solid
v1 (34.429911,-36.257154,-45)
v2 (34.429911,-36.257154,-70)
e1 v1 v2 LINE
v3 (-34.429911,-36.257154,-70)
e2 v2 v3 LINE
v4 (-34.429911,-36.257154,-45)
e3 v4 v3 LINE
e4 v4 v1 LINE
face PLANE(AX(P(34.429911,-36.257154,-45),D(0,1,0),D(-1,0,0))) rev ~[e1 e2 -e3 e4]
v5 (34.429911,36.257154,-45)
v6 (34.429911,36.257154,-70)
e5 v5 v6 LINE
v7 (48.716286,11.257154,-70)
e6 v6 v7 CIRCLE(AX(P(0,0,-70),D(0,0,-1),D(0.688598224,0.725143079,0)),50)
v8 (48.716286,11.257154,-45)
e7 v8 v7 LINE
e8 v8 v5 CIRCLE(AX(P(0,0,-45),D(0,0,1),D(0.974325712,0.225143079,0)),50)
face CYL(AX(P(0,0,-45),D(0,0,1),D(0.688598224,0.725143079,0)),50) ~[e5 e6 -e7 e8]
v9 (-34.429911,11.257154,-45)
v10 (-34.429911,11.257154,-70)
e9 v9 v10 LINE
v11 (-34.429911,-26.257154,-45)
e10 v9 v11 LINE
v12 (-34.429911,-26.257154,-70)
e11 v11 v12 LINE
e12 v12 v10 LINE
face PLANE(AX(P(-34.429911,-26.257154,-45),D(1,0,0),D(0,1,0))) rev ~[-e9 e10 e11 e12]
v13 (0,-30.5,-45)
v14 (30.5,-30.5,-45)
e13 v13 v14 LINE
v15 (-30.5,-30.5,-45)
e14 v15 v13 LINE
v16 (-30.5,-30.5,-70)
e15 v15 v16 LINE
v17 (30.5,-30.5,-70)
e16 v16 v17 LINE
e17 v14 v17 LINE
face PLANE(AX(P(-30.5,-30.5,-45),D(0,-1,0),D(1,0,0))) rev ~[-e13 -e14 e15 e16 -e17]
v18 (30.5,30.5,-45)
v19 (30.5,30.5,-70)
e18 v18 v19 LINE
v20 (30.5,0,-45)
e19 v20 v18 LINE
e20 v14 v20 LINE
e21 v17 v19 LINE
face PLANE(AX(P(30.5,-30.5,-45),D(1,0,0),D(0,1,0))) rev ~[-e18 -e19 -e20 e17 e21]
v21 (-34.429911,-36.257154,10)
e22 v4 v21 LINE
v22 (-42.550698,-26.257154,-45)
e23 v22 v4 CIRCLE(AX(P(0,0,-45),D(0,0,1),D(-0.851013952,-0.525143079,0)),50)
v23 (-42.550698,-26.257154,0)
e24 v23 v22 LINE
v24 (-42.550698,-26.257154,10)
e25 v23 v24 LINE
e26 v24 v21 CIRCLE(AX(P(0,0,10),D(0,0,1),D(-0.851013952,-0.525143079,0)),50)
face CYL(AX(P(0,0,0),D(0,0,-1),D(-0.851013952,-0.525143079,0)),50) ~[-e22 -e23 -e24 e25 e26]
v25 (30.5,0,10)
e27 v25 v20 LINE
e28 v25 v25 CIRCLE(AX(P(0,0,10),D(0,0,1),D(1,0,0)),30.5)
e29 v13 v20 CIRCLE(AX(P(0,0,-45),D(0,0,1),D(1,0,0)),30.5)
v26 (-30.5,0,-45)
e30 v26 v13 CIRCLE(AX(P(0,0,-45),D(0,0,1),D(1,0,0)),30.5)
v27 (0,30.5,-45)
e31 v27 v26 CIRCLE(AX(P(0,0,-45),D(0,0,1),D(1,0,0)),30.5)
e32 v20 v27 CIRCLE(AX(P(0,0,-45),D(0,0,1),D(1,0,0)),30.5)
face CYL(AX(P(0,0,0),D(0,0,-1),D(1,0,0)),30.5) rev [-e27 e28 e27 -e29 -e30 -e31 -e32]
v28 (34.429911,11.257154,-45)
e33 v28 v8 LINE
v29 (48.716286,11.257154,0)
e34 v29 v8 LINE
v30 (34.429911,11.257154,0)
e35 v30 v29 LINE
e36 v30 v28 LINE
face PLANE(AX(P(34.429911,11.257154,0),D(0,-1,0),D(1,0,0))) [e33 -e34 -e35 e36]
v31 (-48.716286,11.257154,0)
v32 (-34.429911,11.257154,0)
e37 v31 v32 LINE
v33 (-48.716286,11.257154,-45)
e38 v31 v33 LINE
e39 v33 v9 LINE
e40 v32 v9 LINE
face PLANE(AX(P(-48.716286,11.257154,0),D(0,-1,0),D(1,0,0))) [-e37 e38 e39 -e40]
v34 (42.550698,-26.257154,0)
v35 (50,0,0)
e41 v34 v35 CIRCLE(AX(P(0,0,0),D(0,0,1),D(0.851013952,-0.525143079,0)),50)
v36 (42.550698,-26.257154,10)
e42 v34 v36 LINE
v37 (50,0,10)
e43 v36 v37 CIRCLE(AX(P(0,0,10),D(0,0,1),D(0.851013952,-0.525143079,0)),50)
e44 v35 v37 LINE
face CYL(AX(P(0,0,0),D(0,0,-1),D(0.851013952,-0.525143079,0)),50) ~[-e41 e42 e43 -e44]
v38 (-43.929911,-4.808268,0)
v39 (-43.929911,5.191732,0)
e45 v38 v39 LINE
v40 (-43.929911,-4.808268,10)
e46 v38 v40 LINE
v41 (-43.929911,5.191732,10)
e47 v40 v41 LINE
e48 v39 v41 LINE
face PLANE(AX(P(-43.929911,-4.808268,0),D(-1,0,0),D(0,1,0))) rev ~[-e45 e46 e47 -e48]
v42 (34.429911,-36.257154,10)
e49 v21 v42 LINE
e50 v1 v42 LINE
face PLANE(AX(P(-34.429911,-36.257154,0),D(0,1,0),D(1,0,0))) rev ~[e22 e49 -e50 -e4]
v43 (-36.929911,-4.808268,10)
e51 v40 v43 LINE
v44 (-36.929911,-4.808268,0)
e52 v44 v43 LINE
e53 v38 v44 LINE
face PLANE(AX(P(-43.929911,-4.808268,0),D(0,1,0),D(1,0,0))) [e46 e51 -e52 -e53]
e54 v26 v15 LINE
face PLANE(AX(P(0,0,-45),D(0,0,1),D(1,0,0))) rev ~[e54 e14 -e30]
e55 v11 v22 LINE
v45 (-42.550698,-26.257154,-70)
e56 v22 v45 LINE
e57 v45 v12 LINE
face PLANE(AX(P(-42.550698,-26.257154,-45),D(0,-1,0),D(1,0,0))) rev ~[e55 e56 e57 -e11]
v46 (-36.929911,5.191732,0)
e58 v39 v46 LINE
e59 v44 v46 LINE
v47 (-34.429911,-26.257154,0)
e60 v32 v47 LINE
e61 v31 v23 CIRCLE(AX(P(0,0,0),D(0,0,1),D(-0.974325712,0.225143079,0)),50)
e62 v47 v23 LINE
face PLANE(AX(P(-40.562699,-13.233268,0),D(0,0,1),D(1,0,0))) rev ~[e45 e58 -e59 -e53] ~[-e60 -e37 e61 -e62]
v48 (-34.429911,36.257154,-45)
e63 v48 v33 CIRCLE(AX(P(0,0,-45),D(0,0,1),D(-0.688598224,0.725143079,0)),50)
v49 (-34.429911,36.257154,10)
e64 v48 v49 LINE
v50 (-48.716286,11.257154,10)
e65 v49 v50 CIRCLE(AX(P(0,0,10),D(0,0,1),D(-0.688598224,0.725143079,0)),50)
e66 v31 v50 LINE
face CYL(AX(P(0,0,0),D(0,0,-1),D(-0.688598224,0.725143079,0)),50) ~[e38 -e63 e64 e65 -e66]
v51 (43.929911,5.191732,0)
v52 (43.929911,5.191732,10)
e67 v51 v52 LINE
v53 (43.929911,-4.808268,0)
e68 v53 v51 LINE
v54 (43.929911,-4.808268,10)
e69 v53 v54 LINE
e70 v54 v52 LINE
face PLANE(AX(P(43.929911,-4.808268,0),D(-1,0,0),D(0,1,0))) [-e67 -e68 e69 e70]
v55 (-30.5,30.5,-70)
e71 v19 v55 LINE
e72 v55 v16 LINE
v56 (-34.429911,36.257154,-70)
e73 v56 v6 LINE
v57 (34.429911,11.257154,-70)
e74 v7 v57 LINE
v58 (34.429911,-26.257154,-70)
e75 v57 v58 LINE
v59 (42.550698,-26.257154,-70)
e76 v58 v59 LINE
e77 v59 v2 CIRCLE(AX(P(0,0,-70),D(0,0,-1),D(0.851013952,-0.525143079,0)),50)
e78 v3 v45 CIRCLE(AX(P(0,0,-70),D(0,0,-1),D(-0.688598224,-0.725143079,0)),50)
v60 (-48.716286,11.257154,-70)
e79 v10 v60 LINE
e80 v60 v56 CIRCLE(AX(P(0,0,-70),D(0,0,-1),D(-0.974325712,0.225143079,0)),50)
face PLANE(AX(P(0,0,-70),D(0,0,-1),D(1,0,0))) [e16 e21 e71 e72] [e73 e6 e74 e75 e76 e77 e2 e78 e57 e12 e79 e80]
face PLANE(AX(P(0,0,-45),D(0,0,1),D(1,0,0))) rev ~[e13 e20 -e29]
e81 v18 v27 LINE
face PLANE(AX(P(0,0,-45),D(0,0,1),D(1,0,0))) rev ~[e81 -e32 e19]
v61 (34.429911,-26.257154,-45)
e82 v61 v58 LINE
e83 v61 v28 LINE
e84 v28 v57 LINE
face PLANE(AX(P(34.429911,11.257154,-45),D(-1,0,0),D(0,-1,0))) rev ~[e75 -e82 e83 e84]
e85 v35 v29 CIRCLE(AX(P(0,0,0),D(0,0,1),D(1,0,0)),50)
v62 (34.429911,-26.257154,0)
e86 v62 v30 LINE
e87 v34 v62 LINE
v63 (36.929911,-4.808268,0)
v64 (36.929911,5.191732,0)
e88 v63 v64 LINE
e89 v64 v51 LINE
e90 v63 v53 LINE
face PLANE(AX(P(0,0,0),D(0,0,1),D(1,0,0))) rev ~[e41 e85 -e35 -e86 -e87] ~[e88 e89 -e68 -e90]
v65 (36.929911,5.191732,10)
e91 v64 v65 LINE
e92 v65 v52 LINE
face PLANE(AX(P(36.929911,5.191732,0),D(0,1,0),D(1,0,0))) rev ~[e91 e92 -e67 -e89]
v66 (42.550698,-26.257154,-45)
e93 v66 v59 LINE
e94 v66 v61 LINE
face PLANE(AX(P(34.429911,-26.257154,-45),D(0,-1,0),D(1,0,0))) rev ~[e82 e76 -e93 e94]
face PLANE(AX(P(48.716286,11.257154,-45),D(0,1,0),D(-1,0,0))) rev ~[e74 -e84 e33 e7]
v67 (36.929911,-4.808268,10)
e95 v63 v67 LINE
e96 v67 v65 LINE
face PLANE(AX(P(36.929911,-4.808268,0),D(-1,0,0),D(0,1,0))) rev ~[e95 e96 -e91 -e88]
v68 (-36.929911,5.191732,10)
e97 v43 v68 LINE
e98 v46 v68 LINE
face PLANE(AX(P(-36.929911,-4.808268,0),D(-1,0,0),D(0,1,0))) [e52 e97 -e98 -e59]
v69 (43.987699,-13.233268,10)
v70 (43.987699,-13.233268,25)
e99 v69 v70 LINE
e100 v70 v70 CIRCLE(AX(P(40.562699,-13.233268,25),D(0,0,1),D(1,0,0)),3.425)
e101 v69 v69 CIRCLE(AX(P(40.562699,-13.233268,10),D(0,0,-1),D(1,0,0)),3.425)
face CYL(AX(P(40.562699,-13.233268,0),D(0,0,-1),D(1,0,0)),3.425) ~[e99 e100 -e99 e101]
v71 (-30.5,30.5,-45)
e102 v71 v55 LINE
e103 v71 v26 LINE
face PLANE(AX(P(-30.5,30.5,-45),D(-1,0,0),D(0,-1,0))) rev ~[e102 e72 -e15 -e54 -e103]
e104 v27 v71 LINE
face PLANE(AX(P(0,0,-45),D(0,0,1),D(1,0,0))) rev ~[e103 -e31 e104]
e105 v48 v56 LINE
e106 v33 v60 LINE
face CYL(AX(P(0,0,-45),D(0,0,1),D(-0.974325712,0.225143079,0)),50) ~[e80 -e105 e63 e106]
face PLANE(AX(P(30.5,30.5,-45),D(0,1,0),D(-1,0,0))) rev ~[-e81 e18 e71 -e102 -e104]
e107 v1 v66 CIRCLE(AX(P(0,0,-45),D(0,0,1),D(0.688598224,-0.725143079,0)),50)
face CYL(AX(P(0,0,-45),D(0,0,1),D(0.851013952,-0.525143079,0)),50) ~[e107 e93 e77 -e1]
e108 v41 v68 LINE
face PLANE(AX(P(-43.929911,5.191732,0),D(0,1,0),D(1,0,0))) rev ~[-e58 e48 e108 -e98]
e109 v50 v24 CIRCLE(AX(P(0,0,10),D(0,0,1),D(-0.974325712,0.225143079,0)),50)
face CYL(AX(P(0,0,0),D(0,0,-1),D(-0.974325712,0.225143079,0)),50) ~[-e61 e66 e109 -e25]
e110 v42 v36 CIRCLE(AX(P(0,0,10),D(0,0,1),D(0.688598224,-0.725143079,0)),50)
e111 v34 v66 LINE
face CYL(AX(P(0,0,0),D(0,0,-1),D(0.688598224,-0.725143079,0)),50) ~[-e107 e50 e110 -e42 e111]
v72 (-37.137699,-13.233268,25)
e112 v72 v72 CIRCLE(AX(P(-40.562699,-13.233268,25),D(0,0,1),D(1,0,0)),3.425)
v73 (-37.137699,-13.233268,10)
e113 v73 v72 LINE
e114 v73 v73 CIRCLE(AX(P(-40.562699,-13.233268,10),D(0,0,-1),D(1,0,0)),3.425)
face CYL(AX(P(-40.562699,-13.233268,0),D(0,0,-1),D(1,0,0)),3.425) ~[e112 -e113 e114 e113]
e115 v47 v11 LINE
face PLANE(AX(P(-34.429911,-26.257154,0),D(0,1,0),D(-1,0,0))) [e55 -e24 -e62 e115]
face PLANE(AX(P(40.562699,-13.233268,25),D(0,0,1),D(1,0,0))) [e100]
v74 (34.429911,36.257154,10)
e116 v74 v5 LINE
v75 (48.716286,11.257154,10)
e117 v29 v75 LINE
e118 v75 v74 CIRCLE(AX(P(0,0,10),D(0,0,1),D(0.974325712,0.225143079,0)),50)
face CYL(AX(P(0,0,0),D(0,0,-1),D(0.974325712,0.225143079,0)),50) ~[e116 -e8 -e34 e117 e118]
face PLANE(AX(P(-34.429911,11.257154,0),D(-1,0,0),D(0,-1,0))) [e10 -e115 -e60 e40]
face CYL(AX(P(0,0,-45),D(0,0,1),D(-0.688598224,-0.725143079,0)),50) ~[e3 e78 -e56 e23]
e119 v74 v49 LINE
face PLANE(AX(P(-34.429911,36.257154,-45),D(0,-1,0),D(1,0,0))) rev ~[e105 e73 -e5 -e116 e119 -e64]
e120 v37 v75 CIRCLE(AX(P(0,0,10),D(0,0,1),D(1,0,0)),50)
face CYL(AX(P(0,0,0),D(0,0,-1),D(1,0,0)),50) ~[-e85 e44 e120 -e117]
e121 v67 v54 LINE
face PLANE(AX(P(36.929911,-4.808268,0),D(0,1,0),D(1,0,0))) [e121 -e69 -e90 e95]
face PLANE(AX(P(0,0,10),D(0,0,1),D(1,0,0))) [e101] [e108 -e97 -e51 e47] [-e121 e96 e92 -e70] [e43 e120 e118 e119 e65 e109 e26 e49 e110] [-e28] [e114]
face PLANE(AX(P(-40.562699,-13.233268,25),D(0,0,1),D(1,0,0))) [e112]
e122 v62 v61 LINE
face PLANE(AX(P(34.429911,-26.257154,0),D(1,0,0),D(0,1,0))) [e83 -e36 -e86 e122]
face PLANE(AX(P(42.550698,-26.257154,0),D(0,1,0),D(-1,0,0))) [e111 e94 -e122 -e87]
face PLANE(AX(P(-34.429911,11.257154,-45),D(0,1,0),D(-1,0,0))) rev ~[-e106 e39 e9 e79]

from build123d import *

# Parameters (mm, degrees)
F0_R     = 30.5
F1_DEPTH = 45
F0_R_2   = 3.425
F0_W     = 7
F0_H     = 10
F2_DEPTH = 10
F3_DEPTH = 25
F5_DEPTH = 25


# Not quite as in the source:
# - a feature names something its author has since deleted; it is built from what else it names


with BuildPart() as f1:
    # F0 (on Top) → F1 (new body)
    with BuildSketch(Plane.XY):
        Polygon((34.4299112098, 11.2571539711), (34.4299112098, 36.2571539711), (-34.4299112098, 36.2571539711), (-34.4299112098, 11.2571539711), (-34.4299112098, -26.2571539711), (-34.4299112098, -36.2571539711), (34.4299112098, -36.2571539711), (34.4299112098, -26.2571539711), align=None)
        Circle(F0_R, mode=Mode.SUBTRACT)
        with BuildLine():
            Line((-34.4299112098, 11.2571539711), (-34.4299112098, 36.2571539711))
            ThreePointArc((-34.4299112098, 36.2571539711), (-43.4116633148, 24.8078110329), (-48.7162856186, 11.2571539711))
            Line((-48.7162856186, 11.2571539711), (-34.4299112098, 11.2571539711))
        make_face()
        with BuildLine():
            Line((34.4299112098, 11.2571539711), (48.7162856186, 11.2571539711))
            ThreePointArc((48.7162856186, 11.2571539711), (43.4116633148, 24.8078110329), (34.4299112098, 36.2571539711))
            Line((34.4299112098, 36.2571539711), (34.4299112098, 11.2571539711))
        make_face()
        with BuildLine():
            ThreePointArc((34.4299112098, -36.2571539711), (38.8137028995, -31.5197789844), (42.5506975893, -26.2571539711))
            Line((42.5506975893, -26.2571539711), (34.4299112098, -26.2571539711))
            Line((34.4299112098, -26.2571539711), (34.4299112098, -36.2571539711))
        make_face()
        with BuildLine():
            ThreePointArc((-42.5506975893, -26.2571539711), (-38.8137028995, -31.5197789844), (-34.4299112098, -36.2571539711))
            Line((-34.4299112098, -36.2571539711), (-34.4299112098, -26.2571539711))
            Line((-34.4299112098, -26.2571539711), (-42.5506975893, -26.2571539711))
        make_face()
    extrude(amount=-F1_DEPTH)

    # F0 (on Top) → F2 (join)
    with BuildSketch(Plane.XY):
        Polygon((34.4299112098, 11.2571539711), (34.4299112098, 36.2571539711), (-34.4299112098, 36.2571539711), (-34.4299112098, 11.2571539711), (-34.4299112098, -26.2571539711), (-34.4299112098, -36.2571539711), (34.4299112098, -36.2571539711), (34.4299112098, -26.2571539711), align=None)
        Circle(F0_R, mode=Mode.SUBTRACT)
        with BuildLine():
            Line((-34.4299112098, 11.2571539711), (-48.7162856186, 11.2571539711))
            ThreePointArc((-48.7162856186, 11.2571539711), (-49.3380824624, -8.1088605202), (-42.5506975893, -26.2571539711))
            Line((-42.5506975893, -26.2571539711), (-34.4299112098, -26.2571539711))
            Line((-34.4299112098, -26.2571539711), (-34.4299112098, 11.2571539711))
        make_face()
        with Locations((-40.5626991825, -13.233267504)):
            Circle(F0_R_2, mode=Mode.SUBTRACT)
        with Locations((-40.4299112098, 0.191732496)):
            Rectangle(F0_W, F0_H, mode=Mode.SUBTRACT)
        with BuildLine():
            ThreePointArc((42.5506975893, -26.2571539711), (48.1016365598, -13.6467051066), (50, 0))
            ThreePointArc((50, 0), (49.6780347887, 5.6650560046), (48.7162856186, 11.2571539711))
            Line((48.7162856186, 11.2571539711), (34.4299112098, 11.2571539711))
            Line((34.4299112098, 11.2571539711), (34.4299112098, -26.2571539711))
            Line((34.4299112098, -26.2571539711), (42.5506975893, -26.2571539711))
        make_face()
        with Locations((40.5626991825, -13.233267504)):
            Circle(F0_R_2, mode=Mode.SUBTRACT)
        with Locations((40.4299112098, 0.191732496)):
            Rectangle(F0_W, F0_H, mode=Mode.SUBTRACT)
        with BuildLine():
            Line((34.4299112098, 11.2571539711), (48.7162856186, 11.2571539711))
            ThreePointArc((48.7162856186, 11.2571539711), (43.4116633148, 24.8078110329), (34.4299112098, 36.2571539711))
            Line((34.4299112098, 36.2571539711), (34.4299112098, 11.2571539711))
        make_face()
        with BuildLine():
            Line((-34.4299112098, 11.2571539711), (-34.4299112098, 36.2571539711))
            ThreePointArc((-34.4299112098, 36.2571539711), (-43.4116633148, 24.8078110329), (-48.7162856186, 11.2571539711))
            Line((-48.7162856186, 11.2571539711), (-34.4299112098, 11.2571539711))
        make_face()
        with BuildLine():
            ThreePointArc((34.4299112098, -36.2571539711), (38.8137028995, -31.5197789844), (42.5506975893, -26.2571539711))
            Line((42.5506975893, -26.2571539711), (34.4299112098, -26.2571539711))
            Line((34.4299112098, -26.2571539711), (34.4299112098, -36.2571539711))
        make_face()
        with BuildLine():
            ThreePointArc((-42.5506975893, -26.2571539711), (-38.8137028995, -31.5197789844), (-34.4299112098, -36.2571539711))
            Line((-34.4299112098, -36.2571539711), (-34.4299112098, -26.2571539711))
            Line((-34.4299112098, -26.2571539711), (-42.5506975893, -26.2571539711))
        make_face()
        with Locations((-40.5626991825, -13.233267504)):
            Circle(F0_R_2)
        with Locations((40.5626991825, -13.233267504)):
            Circle(F0_R_2)
    extrude(amount=F2_DEPTH)

    # F0 (on Top) → F3 (join)
    with BuildSketch(Plane.XY):
        with Locations((-40.5626991825, -13.233267504)):
            Circle(F0_R_2)
        with Locations((40.5626991825, -13.233267504)):
            Circle(F0_R_2)
    extrude(amount=F3_DEPTH)

    # F4 (on face) → F5 (join)
    with BuildSketch(Plane(origin=(0, 0, -45), x_dir=(1, 0, 0), z_dir=(0, 0, -1))):
        Polygon((-34.4299112098, -36.2571539711), (34.4299112098, -36.2571539711), (34.4299112098, -11.2571539711), (34.4299112098, 26.2571539711), (34.4299112098, 36.2571539711), (-34.4299112098, 36.2571539711), (-34.4299112098, 26.2571539711), (-34.4299112098, -11.2571539711), align=None)
        Polygon((0, 30.5), (30.5, 30.5), (30.5, 0), (30.5, -30.5), (-3.98e-08, -30.5), (-30.5, -30.5), (-30.5, 4.66e-08), (-30.5, 30.5), align=None, mode=Mode.SUBTRACT)
        with BuildLine():
            Line((34.4299112098, -11.2571539711), (34.4299112098, -36.2571539711))
            ThreePointArc((34.4299112098, -36.2571539711), (43.4116633148, -24.8078110329), (48.7162856186, -11.2571539711))
            Line((48.7162856186, -11.2571539711), (34.4299112098, -11.2571539711))
        make_face()
        with BuildLine():
            ThreePointArc((-48.7162856186, -11.2571539711), (-43.4116633148, -24.8078110329), (-34.4299112098, -36.2571539711))
            Line((-34.4299112098, -36.2571539711), (-34.4299112098, -11.2571539711))
            Line((-34.4299112098, -11.2571539711), (-48.7162856186, -11.2571539711))
        make_face()
        with BuildLine():
            Line((-42.5506975893, 26.2571539711), (-34.4299112098, 26.2571539711))
            Line((-34.4299112098, 26.2571539711), (-34.4299112098, 36.2571539711))
            ThreePointArc((-34.4299112098, 36.2571539711), (-38.8137028995, 31.5197789844), (-42.5506975893, 26.2571539711))
        make_face()
        with BuildLine():
            Line((34.4299112098, 36.2571539711), (34.4299112098, 26.2571539711))
            Line((34.4299112098, 26.2571539711), (42.5506975893, 26.2571539711))
            ThreePointArc((42.5506975893, 26.2571539711), (38.8137028995, 31.5197789844), (34.4299112098, 36.2571539711))
        make_face()
    extrude(amount=F5_DEPTH)


solid = f1.part
